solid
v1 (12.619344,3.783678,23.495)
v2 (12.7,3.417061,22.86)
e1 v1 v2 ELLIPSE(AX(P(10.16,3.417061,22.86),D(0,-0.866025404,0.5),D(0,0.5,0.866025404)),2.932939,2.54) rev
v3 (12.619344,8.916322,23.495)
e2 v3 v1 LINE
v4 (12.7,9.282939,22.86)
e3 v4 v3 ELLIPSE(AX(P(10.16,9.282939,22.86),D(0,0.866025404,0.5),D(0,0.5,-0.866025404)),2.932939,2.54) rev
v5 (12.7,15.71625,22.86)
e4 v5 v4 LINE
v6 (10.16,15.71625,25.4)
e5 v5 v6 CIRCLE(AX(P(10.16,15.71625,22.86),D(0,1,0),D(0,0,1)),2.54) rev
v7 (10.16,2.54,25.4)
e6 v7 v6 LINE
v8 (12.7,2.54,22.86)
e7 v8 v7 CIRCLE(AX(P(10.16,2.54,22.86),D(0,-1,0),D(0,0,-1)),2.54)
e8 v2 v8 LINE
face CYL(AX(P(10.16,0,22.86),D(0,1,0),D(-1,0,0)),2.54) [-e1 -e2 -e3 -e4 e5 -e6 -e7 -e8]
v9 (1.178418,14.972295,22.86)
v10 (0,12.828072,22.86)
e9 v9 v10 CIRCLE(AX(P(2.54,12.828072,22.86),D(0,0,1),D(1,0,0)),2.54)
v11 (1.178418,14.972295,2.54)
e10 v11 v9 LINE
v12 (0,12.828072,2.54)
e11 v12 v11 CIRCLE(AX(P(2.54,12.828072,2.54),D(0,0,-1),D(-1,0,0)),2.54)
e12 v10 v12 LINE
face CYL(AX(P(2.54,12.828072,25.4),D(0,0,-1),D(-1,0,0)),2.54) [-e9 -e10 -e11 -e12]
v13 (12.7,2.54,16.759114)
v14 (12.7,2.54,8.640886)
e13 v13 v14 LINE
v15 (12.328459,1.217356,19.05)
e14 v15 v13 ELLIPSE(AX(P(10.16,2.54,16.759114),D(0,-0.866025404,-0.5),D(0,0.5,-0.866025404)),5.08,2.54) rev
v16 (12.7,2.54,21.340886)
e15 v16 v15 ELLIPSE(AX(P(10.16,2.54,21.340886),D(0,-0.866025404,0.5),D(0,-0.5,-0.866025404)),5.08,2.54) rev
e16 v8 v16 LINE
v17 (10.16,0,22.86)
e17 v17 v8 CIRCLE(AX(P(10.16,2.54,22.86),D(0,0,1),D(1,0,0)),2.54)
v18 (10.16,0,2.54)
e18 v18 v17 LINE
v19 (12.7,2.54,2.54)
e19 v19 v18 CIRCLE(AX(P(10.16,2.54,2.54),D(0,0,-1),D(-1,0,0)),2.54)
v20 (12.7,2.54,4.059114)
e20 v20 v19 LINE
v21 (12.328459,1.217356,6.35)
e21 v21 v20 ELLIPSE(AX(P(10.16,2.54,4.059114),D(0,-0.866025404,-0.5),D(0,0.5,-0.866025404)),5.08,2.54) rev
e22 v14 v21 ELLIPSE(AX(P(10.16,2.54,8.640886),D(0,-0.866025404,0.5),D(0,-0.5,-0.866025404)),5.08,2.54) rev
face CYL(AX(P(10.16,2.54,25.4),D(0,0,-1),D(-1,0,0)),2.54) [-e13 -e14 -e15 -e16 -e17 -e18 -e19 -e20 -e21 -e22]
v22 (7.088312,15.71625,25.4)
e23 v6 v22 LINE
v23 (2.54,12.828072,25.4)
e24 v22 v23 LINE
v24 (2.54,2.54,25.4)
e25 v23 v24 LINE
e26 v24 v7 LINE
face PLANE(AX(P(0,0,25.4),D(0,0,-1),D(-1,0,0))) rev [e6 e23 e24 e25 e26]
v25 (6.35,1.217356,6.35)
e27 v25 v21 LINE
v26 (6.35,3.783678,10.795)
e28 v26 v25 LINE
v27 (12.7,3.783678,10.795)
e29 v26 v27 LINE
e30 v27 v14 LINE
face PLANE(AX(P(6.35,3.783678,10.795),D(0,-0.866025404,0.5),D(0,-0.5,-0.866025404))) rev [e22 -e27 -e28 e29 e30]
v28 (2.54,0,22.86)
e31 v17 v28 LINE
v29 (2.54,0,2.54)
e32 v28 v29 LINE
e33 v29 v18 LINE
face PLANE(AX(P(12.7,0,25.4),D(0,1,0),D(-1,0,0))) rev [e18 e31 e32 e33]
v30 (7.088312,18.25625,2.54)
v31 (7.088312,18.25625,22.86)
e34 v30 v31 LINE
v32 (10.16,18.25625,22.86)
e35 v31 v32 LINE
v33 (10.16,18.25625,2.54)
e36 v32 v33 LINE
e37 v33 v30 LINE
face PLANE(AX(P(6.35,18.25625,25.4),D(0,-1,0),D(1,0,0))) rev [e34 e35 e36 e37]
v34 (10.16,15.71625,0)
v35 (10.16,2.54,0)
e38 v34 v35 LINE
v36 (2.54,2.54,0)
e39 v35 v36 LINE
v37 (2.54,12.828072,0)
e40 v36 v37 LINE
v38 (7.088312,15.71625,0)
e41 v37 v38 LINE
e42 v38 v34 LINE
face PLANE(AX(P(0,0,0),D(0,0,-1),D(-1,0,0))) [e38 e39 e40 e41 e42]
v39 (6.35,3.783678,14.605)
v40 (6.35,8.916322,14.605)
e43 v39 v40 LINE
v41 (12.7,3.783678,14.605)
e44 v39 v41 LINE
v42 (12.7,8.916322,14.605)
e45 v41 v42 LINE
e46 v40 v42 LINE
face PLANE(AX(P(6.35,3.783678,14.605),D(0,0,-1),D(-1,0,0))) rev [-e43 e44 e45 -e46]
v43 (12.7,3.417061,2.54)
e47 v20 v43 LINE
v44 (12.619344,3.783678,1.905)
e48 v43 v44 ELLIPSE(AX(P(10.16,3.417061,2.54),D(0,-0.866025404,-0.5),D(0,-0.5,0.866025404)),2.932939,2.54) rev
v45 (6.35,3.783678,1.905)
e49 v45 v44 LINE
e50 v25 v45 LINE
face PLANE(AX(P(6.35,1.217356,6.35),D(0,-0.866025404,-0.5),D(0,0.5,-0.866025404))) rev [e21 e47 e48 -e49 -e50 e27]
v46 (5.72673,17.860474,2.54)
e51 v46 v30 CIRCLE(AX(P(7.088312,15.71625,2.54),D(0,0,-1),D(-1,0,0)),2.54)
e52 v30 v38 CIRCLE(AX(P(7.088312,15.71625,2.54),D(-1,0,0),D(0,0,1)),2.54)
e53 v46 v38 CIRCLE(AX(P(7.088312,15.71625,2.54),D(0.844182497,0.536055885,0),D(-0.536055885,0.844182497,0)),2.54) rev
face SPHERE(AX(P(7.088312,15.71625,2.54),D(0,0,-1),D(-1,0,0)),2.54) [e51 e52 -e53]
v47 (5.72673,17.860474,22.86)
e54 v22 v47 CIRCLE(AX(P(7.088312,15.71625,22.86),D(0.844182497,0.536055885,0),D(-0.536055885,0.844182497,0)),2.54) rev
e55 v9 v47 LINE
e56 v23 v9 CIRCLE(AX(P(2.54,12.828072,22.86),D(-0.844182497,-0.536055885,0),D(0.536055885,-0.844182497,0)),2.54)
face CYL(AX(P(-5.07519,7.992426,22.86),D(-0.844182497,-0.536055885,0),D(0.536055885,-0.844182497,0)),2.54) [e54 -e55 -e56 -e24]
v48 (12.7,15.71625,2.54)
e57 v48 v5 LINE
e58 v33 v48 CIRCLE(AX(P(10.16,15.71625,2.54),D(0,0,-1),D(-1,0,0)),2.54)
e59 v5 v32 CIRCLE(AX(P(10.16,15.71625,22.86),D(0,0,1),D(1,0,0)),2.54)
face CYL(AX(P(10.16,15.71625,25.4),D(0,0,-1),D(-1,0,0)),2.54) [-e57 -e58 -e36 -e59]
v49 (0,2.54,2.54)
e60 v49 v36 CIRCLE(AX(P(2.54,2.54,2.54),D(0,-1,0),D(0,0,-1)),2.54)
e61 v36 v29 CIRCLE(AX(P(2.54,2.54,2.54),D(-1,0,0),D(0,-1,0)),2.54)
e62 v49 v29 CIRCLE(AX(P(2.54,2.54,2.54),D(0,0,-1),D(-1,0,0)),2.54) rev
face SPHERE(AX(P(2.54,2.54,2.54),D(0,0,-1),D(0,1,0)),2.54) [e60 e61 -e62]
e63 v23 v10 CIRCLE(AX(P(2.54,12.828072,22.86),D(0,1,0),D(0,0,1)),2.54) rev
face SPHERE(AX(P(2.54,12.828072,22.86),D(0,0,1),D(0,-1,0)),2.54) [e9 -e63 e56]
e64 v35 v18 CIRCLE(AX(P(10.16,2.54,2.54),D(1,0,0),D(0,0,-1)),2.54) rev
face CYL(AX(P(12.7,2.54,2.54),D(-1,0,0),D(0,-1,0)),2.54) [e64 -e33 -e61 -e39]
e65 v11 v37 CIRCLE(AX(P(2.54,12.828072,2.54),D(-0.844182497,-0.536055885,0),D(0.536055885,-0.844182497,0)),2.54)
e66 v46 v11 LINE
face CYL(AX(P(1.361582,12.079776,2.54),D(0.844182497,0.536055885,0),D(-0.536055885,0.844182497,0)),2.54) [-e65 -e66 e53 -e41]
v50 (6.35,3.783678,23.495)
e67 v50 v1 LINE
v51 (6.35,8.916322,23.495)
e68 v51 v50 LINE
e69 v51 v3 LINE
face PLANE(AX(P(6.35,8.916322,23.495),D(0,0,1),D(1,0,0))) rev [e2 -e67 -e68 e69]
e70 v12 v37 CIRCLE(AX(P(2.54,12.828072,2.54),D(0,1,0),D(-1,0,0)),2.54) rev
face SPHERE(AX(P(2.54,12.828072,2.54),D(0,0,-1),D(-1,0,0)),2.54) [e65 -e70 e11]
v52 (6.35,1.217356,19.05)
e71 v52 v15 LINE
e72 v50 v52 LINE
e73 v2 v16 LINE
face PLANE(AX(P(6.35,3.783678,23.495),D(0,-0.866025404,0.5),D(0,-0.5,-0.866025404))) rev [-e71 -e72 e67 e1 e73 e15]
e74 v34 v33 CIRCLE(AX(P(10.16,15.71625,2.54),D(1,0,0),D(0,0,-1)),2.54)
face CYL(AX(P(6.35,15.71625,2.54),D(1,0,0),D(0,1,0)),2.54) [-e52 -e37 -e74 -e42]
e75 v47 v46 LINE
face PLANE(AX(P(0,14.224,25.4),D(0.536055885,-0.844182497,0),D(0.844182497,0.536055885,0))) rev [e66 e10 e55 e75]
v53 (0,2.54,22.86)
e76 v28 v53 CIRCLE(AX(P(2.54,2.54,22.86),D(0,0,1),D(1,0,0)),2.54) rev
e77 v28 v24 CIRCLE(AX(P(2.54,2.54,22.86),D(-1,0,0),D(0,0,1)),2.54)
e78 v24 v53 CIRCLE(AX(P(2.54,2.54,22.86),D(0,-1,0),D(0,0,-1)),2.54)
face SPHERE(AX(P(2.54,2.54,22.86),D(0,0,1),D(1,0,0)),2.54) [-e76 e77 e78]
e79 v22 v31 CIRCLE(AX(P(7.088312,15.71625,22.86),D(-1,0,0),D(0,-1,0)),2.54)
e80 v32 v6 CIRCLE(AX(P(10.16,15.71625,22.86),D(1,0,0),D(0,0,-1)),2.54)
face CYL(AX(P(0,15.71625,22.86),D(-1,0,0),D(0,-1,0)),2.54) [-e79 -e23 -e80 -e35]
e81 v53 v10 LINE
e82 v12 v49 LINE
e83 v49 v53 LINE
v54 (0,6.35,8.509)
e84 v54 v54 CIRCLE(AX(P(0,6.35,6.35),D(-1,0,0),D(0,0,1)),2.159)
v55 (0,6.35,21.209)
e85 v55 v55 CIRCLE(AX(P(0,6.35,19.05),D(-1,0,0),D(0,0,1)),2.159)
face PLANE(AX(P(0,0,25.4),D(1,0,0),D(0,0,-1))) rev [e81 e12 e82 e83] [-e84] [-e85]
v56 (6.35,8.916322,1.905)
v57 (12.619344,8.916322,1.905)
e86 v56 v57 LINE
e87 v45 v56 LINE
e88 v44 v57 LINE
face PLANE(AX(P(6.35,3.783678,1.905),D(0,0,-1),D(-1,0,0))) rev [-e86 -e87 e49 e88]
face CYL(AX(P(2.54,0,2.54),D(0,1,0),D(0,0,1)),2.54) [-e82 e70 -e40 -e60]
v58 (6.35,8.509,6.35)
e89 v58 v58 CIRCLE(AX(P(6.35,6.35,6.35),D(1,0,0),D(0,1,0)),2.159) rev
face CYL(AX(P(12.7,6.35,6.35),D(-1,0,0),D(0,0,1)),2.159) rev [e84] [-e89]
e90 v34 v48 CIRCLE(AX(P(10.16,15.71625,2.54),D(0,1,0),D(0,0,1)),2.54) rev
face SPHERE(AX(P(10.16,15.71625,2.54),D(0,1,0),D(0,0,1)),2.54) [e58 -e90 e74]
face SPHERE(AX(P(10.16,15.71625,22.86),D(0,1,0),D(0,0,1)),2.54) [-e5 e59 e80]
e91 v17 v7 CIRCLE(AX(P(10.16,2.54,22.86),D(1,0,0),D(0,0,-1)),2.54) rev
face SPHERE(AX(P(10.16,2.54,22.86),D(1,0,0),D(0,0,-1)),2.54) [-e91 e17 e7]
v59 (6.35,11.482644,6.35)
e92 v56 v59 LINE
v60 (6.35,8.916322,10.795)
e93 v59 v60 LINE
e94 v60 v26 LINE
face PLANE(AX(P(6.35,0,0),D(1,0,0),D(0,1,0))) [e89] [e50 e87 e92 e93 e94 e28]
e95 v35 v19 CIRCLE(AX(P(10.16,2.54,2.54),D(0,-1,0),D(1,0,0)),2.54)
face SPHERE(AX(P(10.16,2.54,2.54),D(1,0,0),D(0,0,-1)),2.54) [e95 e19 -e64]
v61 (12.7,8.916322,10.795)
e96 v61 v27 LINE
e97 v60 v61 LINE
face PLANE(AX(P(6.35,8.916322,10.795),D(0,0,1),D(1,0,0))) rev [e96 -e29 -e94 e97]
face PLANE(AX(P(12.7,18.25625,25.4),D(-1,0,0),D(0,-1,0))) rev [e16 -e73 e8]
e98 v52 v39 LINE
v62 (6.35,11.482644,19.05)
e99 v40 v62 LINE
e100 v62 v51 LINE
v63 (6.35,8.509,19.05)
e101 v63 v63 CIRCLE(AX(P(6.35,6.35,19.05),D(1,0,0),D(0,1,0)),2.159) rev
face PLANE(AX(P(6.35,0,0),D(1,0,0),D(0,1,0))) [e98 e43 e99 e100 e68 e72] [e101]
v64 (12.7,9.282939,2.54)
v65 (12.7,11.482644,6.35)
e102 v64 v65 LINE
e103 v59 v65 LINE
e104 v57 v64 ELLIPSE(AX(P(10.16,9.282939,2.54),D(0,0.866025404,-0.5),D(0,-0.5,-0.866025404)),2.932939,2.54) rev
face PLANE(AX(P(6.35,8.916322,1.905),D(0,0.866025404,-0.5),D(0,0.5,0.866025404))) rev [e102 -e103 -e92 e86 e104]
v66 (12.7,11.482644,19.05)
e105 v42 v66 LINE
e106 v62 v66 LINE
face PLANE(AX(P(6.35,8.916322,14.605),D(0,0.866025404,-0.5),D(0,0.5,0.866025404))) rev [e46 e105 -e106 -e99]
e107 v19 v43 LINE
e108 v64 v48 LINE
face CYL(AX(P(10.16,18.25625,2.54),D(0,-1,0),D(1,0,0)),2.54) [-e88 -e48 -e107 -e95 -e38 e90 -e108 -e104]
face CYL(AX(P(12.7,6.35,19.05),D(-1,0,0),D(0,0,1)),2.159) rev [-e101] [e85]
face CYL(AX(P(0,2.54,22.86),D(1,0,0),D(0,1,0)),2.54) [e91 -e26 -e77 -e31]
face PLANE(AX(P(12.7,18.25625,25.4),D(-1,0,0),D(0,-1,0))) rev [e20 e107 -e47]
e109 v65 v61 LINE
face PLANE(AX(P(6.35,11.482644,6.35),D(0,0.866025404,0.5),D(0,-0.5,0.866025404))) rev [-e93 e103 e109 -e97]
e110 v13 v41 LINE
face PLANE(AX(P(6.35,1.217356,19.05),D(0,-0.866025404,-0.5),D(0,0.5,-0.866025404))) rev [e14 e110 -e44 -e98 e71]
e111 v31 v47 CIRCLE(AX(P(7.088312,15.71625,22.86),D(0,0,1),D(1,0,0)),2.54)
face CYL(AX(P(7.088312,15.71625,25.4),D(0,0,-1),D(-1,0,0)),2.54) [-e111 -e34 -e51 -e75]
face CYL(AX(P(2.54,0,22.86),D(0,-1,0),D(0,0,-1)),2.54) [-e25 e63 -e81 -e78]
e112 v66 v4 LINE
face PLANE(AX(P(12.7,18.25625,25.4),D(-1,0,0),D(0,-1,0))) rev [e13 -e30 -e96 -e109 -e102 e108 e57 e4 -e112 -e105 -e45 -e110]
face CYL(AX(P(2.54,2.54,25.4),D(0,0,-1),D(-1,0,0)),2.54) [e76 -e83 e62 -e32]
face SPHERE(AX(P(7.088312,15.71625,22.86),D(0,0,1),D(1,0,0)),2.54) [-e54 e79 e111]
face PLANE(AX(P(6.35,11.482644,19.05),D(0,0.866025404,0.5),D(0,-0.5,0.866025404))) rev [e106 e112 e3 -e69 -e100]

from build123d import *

# Parameters (mm, degrees)
BOSS_EXTRUDE1_DEPTH = 25.4
SKETCH4_R           = 2.159
CUT_EXTRUDE1_DEPTH  = 34.76004538
CUT_EXTRUDE2_DEPTH  = 6.35
FILLET1_R           = 2.54


with BuildPart() as part:
    # Sketch3 → Boss-Extrude1 (new body)
    with BuildSketch(Plane.XY):
        Polygon((0, 14.224), (6.35, 18.25625), (12.7, 18.25625), (12.7, 0), (0, 0), align=None)
    extrude(amount=BOSS_EXTRUDE1_DEPTH)

    # Sketch4 → Cut-Extrude1 (cut, through all)
    with BuildSketch(Plane.ZY):
        with Locations((6.35, 6.35)):
            Circle(SKETCH4_R)
        with Locations((19.05, 6.35)):
            Circle(SKETCH4_R)
    extrude(amount=-CUT_EXTRUDE1_DEPTH, mode=Mode.SUBTRACT)

    # Sketch6 → Cut-Extrude2 (cut)
    with BuildSketch(Plane(origin=(12.7, 0, 0), x_dir=(0, 0, -1), z_dir=(1, 0, 0))):
        Polygon((-14.605, 8.916321947), (-19.05, 11.482643893), (-23.495, 8.916321947), (-23.495, 3.783678053), (-19.05, 1.217356107), (-14.605, 3.783678053), align=None)
        Polygon((-1.905, 3.783678053), (-1.905, 8.916321947), (-6.35, 11.482643893), (-10.795, 8.916321947), (-10.795, 3.783678053), (-6.35, 1.217356107), align=None)
    extrude(amount=-CUT_EXTRUDE2_DEPTH, mode=Mode.SUBTRACT)

    # Fillet1
    # the kernel refuses this fillet: 2.54 mm, written as the material it takes off along each edge
    with BuildSketch(Plane(origin=(2.54, 2.54, 2.54), x_dir=(0, 0, -1), z_dir=(-1, 0, 0))) as fillet1_piece_1_section:
        Polygon((0, 0), (FILLET1_R, 0), (FILLET1_R, FILLET1_R), (0, FILLET1_R), align=None)
    fillet1_piece_1 = extrude(amount=FILLET1_R, mode=Mode.PRIVATE)
    fillet1_piece_1 = fillet1_piece_1 - Plane(origin=(2.54, 2.54, 2.54), x_dir=(0, 0.7071067811865475, 0.7071067811865475), z_dir=(-1, 0, 0)) * Sphere(FILLET1_R, mode=Mode.PRIVATE)
    add(fillet1_piece_1, mode=Mode.SUBTRACT)
    with BuildSketch(Plane(origin=(2.54, 2.54, 22.86), x_dir=(0, 0, 1), z_dir=(-1, 0, 0))) as fillet1_piece_2_section:
        Polygon((0, 0), (FILLET1_R, 0), (FILLET1_R, -FILLET1_R), (0, -FILLET1_R), align=None)
    fillet1_piece_2 = extrude(amount=FILLET1_R, mode=Mode.PRIVATE)
    fillet1_piece_2 = fillet1_piece_2 - Plane(origin=(2.54, 2.54, 22.86), x_dir=(0, 0.7071067811865475, -0.7071067811865475), z_dir=(-1, 0, 0)) * Sphere(FILLET1_R, mode=Mode.PRIVATE)
    add(fillet1_piece_2, mode=Mode.SUBTRACT)
    with BuildSketch(Plane(origin=(10.16, 2.54, 2.54), x_dir=(0, 0, -1), z_dir=(1, 0, 0))) as fillet1_piece_3_section:
        Polygon((0, 0), (FILLET1_R, 0), (FILLET1_R, -FILLET1_R), (0, -FILLET1_R), align=None)
    fillet1_piece_3 = extrude(amount=FILLET1_R, mode=Mode.PRIVATE)
    fillet1_piece_3 = fillet1_piece_3 - Plane(origin=(10.16, 2.54, 2.54), x_dir=(0, 0.7071067811865475, 0.7071067811865475), z_dir=(1, 0, 0)) * Sphere(FILLET1_R, mode=Mode.PRIVATE)
    add(fillet1_piece_3, mode=Mode.SUBTRACT)
    with BuildSketch(Plane(origin=(10.16, 2.54, 22.86), x_dir=(0, 0, 1), z_dir=(1, 0, 0))) as fillet1_piece_4_section:
        Polygon((0, 0), (FILLET1_R, 0), (FILLET1_R, FILLET1_R), (0, FILLET1_R), align=None)
    fillet1_piece_4 = extrude(amount=FILLET1_R, mode=Mode.PRIVATE)
    fillet1_piece_4 = fillet1_piece_4 - Plane(origin=(10.16, 2.54, 22.86), x_dir=(0, 0.7071067811865475, -0.7071067811865475), z_dir=(1, 0, 0)) * Sphere(FILLET1_R, mode=Mode.PRIVATE)
    add(fillet1_piece_4, mode=Mode.SUBTRACT)
    with BuildSketch(Plane(origin=(10.16, 15.71625, 2.54), x_dir=(0, 1, 0), z_dir=(1, 0, 0))) as fillet1_piece_5_section:
        Polygon((0, 0), (FILLET1_R, 0), (FILLET1_R, -FILLET1_R), (0, -FILLET1_R), align=None)
    fillet1_piece_5 = extrude(amount=FILLET1_R, mode=Mode.PRIVATE)
    fillet1_piece_5 = fillet1_piece_5 - Plane(origin=(10.16, 15.71625, 2.54), x_dir=(0, -0.7071067811865475, 0.7071067811865475), z_dir=(1, 0, 0)) * Sphere(FILLET1_R, mode=Mode.PRIVATE)
    add(fillet1_piece_5, mode=Mode.SUBTRACT)
    with BuildSketch(Plane(origin=(10.16, 15.71625, 22.86), x_dir=(0, 1, 0), z_dir=(1, 0, 0))) as fillet1_piece_6_section:
        Polygon((0, 0), (FILLET1_R, 0), (FILLET1_R, FILLET1_R), (0, FILLET1_R), align=None)
    fillet1_piece_6 = extrude(amount=FILLET1_R, mode=Mode.PRIVATE)
    fillet1_piece_6 = fillet1_piece_6 - Plane(origin=(10.16, 15.71625, 22.86), x_dir=(0, -0.7071067811865475, -0.7071067811865475), z_dir=(1, 0, 0)) * Sphere(FILLET1_R, mode=Mode.PRIVATE)
    add(fillet1_piece_6, mode=Mode.SUBTRACT)
    with BuildSketch(Plane(origin=(7.088311936, 15.71625, 2.54), x_dir=(-0.5360558854014316, 0.8441824966951682, 0), z_dir=(0, 0, -1))) as fillet1_piece_7_section:
        Polygon((0, 0), (FILLET1_R, 0), (FILLET1_R, FILLET1_R * 0.290673990433), (FILLET1_R * 0.844182496695, FILLET1_R * 0.536055885401), align=None)
    fillet1_piece_7 = extrude(amount=FILLET1_R, mode=Mode.PRIVATE)
    fillet1_piece_7 = fillet1_piece_7 - Plane(origin=(7.088311936, 15.71625, 2.54), x_dir=(0.2791213923231542, -0.9602558244278364, 0), z_dir=(0, 0, -1)) * Sphere(FILLET1_R, mode=Mode.PRIVATE)
    add(fillet1_piece_7, mode=Mode.SUBTRACT)
    with BuildSketch(Plane(origin=(7.088311936, 15.71625, 22.86), x_dir=(-0.5360558854014316, 0.8441824966951682, 0), z_dir=(0, 0, 1))) as fillet1_piece_8_section:
        Polygon((0, 0), (FILLET1_R, 0), (FILLET1_R, -FILLET1_R * 0.290673990433), (FILLET1_R * 0.844182496695, -FILLET1_R * 0.536055885401), align=None)
    fillet1_piece_8 = extrude(amount=FILLET1_R, mode=Mode.PRIVATE)
    fillet1_piece_8 = fillet1_piece_8 - Plane(origin=(7.088311936, 15.71625, 22.86), x_dir=(0.2791213923231542, -0.9602558244278364, 0), z_dir=(0, 0, 1)) * Sphere(FILLET1_R, mode=Mode.PRIVATE)
    add(fillet1_piece_8, mode=Mode.SUBTRACT)
    with BuildSketch(Plane(origin=(2.54, 12.828071921, 22.86), x_dir=(-0.5360558854014316, 0.8441824966951682, 0), z_dir=(0, 0, 1))) as fillet1_piece_9_section:
        Polygon((0, 0), (FILLET1_R, 0), (FILLET1_R, FILLET1_R * 0.549577983925), (FILLET1_R * 0.536055885401, FILLET1_R * 0.844182496695), align=None)
    fillet1_piece_9 = extrude(amount=FILLET1_R, mode=Mode.PRIVATE)
    fillet1_piece_9 = fillet1_piece_9 - Plane(origin=(2.54, 12.828071921, 22.86), x_dir=(0.8763720344127349, -0.4816347758408693, 0), z_dir=(0, 0, 1)) * Sphere(FILLET1_R, mode=Mode.PRIVATE)
    add(fillet1_piece_9, mode=Mode.SUBTRACT)
    with BuildSketch(Plane(origin=(2.54, 12.828071921, 2.54), x_dir=(-0.5360558854014316, 0.8441824966951682, 0), z_dir=(0, 0, -1))) as fillet1_piece_10_section:
        Polygon((0, 0), (FILLET1_R, 0), (FILLET1_R, -FILLET1_R * 0.549577983925), (FILLET1_R * 0.536055885401, -FILLET1_R * 0.844182496695), align=None)
    fillet1_piece_10 = extrude(amount=FILLET1_R, mode=Mode.PRIVATE)
    fillet1_piece_10 = fillet1_piece_10 - Plane(origin=(2.54, 12.828071921, 2.54), x_dir=(0.8763720344127349, -0.4816347758408693, 0), z_dir=(0, 0, -1)) * Sphere(FILLET1_R, mode=Mode.PRIVATE)
    add(fillet1_piece_10, mode=Mode.SUBTRACT)
    with BuildSketch(Plane(origin=(0, 0, 2.54), x_dir=(0, 1, 0), z_dir=(0, 0, 1)), Plane(origin=(12.7, 0, 2.54), x_dir=(-1, 0, 0), z_dir=(0, 0, 1))) as fillet1_piece_11:
        with BuildLine():
            CenterArc((FILLET1_R, -FILLET1_R), FILLET1_R, 90, 90)
            Line((0, -FILLET1_R), (0, 0))
            Line((0, 0), (FILLET1_R, 0))
        make_face()
    extrude(amount=20.32, mode=Mode.SUBTRACT)
    with BuildSketch(Plane(origin=(12.7, 18.25625, 2.54), x_dir=(-1, 0, 0), z_dir=(0, 0, 1))) as fillet1_piece_12:
        with BuildLine():
            CenterArc((FILLET1_R, FILLET1_R), FILLET1_R, 180, 90)
            Line((0, FILLET1_R), (0, 0))
            Line((0, 0), (FILLET1_R, 0))
        make_face()
    extrude(amount=20.32, mode=Mode.SUBTRACT)
    with BuildSketch(Plane(origin=(6.35, 18.25625, 2.54), x_dir=(-0.8441824966951671, -0.536055885401433, 0), z_dir=(0, 0, 1))) as fillet1_piece_13:
        with BuildLine():
            CenterArc((FILLET1_R * 0.290673990433, FILLET1_R), FILLET1_R, 237.58445267, 32.41554733)
            Line((-FILLET1_R * 0.245381894968, FILLET1_R * 0.155817503305), (0, 0))
            Line((0, 0), (FILLET1_R * 0.290673990433, 0))
        make_face()
    extrude(amount=20.32, mode=Mode.SUBTRACT)
    with BuildSketch(Plane(origin=(1.178418051, 14.972295462, 25.4), x_dir=(0, 0, -1), z_dir=(0.844182496695168, 0.5360558854014315, 0))) as fillet1_piece_14:
        with BuildLine():
            CenterArc((FILLET1_R, -FILLET1_R), FILLET1_R, 90, 90)
            Line((0, -FILLET1_R), (0, 0))
            Line((0, 0), (FILLET1_R, 0))
        make_face()
    extrude(amount=5.387830183, mode=Mode.SUBTRACT)
    with BuildSketch(Plane(origin=(7.088311936, 18.25625, 25.4), x_dir=(0, 0, -1), z_dir=(1, 0, 0))) as fillet1_piece_15:
        with BuildLine():
            CenterArc((FILLET1_R, -FILLET1_R), FILLET1_R, 90, 90)
            Line((0, -FILLET1_R), (0, 0))
            Line((0, 0), (FILLET1_R, 0))
        make_face()
    extrude(amount=3.071688064, mode=Mode.SUBTRACT)
    with BuildSketch(Plane(origin=(12.7, 15.71625, 25.4), x_dir=(-1, 0, 0), z_dir=(0, -1, 0))) as fillet1_piece_16:
        with BuildLine():
            CenterArc((FILLET1_R, FILLET1_R), FILLET1_R, 180, 90)
            Line((0, FILLET1_R), (0, 0))
            Line((0, 0), (FILLET1_R, 0))
        make_face()
    extrude(amount=13.17625, mode=Mode.SUBTRACT)
    with BuildSketch(Plane(origin=(10.16, 0, 25.4), x_dir=(0, 1, 0), z_dir=(-1, 0, 0))) as fillet1_piece_17:
        with BuildLine():
            CenterArc((FILLET1_R, FILLET1_R), FILLET1_R, 180, 90)
            Line((0, FILLET1_R), (0, 0))
            Line((0, 0), (FILLET1_R, 0))
        make_face()
    extrude(amount=7.62, mode=Mode.SUBTRACT)
    with BuildSketch(Plane(origin=(0, 2.54, 25.4), x_dir=(0, 0, -1), z_dir=(0, 1, 0))) as fillet1_piece_18:
        with BuildLine():
            CenterArc((FILLET1_R, -FILLET1_R), FILLET1_R, 90, 90)
            Line((0, -FILLET1_R), (0, 0))
            Line((0, 0), (FILLET1_R, 0))
        make_face()
    extrude(amount=10.288071921, mode=Mode.SUBTRACT)
    with BuildSketch(Plane(origin=(10.16, 0, 0), x_dir=(0, 1, 0), z_dir=(-1, 0, 0))) as fillet1_piece_19:
        with BuildLine():
            CenterArc((FILLET1_R, -FILLET1_R), FILLET1_R, 90, 90)
            Line((0, -FILLET1_R), (0, 0))
            Line((0, 0), (FILLET1_R, 0))
        make_face()
    extrude(amount=7.62, mode=Mode.SUBTRACT)
    with BuildSketch(Plane(origin=(12.7, 15.71625, 0), x_dir=(-1, 0, 0), z_dir=(0, -1, 0))) as fillet1_piece_20:
        with BuildLine():
            CenterArc((FILLET1_R, -FILLET1_R), FILLET1_R, 90, 90)
            Line((0, -FILLET1_R), (0, 0))
            Line((0, 0), (FILLET1_R, 0))
        make_face()
    extrude(amount=13.17625, mode=Mode.SUBTRACT)
    with BuildSketch(Plane(origin=(7.088311936, 18.25625, 0), x_dir=(0, 0, 1), z_dir=(1, 0, 0))) as fillet1_piece_21:
        with BuildLine():
            CenterArc((FILLET1_R, FILLET1_R), FILLET1_R, 180, 90)
            Line((0, FILLET1_R), (0, 0))
            Line((0, 0), (FILLET1_R, 0))
        make_face()
    extrude(amount=3.071688064, mode=Mode.SUBTRACT)
    with BuildSketch(Plane(origin=(1.178418051, 14.972295462, 0), x_dir=(0, 0, 1), z_dir=(0.844182496695168, 0.5360558854014315, 0))) as fillet1_piece_22:
        with BuildLine():
            CenterArc((FILLET1_R, FILLET1_R), FILLET1_R, 180, 90)
            Line((0, FILLET1_R), (0, 0))
            Line((0, 0), (FILLET1_R, 0))
        make_face()
    extrude(amount=5.387830183, mode=Mode.SUBTRACT)
    with BuildSketch(Plane(origin=(0, 2.54, 0), x_dir=(0, 0, 1), z_dir=(0, 1, 0))) as fillet1_piece_23:
        with BuildLine():
            CenterArc((FILLET1_R, FILLET1_R), FILLET1_R, 180, 90)
            Line((0, FILLET1_R), (0, 0))
            Line((0, 0), (FILLET1_R, 0))
        make_face()
    extrude(amount=10.288071921, mode=Mode.SUBTRACT)
    with BuildSketch(Plane(origin=(0, 14.224, 2.54), x_dir=(0.844182496695168, 0.5360558854014316, 0), z_dir=(0, 0, 1))) as fillet1_piece_24:
        with BuildLine():
            CenterArc((FILLET1_R * 0.549577983925, -FILLET1_R), FILLET1_R, 90, 57.58445267)
            Line((-FILLET1_R * 0.29460451277, -FILLET1_R * 0.463944114599), (0, 0))
            Line((0, 0), (FILLET1_R * 0.549577983925, 0))
        make_face()
    extrude(amount=20.32, mode=Mode.SUBTRACT)


solid = part.part
